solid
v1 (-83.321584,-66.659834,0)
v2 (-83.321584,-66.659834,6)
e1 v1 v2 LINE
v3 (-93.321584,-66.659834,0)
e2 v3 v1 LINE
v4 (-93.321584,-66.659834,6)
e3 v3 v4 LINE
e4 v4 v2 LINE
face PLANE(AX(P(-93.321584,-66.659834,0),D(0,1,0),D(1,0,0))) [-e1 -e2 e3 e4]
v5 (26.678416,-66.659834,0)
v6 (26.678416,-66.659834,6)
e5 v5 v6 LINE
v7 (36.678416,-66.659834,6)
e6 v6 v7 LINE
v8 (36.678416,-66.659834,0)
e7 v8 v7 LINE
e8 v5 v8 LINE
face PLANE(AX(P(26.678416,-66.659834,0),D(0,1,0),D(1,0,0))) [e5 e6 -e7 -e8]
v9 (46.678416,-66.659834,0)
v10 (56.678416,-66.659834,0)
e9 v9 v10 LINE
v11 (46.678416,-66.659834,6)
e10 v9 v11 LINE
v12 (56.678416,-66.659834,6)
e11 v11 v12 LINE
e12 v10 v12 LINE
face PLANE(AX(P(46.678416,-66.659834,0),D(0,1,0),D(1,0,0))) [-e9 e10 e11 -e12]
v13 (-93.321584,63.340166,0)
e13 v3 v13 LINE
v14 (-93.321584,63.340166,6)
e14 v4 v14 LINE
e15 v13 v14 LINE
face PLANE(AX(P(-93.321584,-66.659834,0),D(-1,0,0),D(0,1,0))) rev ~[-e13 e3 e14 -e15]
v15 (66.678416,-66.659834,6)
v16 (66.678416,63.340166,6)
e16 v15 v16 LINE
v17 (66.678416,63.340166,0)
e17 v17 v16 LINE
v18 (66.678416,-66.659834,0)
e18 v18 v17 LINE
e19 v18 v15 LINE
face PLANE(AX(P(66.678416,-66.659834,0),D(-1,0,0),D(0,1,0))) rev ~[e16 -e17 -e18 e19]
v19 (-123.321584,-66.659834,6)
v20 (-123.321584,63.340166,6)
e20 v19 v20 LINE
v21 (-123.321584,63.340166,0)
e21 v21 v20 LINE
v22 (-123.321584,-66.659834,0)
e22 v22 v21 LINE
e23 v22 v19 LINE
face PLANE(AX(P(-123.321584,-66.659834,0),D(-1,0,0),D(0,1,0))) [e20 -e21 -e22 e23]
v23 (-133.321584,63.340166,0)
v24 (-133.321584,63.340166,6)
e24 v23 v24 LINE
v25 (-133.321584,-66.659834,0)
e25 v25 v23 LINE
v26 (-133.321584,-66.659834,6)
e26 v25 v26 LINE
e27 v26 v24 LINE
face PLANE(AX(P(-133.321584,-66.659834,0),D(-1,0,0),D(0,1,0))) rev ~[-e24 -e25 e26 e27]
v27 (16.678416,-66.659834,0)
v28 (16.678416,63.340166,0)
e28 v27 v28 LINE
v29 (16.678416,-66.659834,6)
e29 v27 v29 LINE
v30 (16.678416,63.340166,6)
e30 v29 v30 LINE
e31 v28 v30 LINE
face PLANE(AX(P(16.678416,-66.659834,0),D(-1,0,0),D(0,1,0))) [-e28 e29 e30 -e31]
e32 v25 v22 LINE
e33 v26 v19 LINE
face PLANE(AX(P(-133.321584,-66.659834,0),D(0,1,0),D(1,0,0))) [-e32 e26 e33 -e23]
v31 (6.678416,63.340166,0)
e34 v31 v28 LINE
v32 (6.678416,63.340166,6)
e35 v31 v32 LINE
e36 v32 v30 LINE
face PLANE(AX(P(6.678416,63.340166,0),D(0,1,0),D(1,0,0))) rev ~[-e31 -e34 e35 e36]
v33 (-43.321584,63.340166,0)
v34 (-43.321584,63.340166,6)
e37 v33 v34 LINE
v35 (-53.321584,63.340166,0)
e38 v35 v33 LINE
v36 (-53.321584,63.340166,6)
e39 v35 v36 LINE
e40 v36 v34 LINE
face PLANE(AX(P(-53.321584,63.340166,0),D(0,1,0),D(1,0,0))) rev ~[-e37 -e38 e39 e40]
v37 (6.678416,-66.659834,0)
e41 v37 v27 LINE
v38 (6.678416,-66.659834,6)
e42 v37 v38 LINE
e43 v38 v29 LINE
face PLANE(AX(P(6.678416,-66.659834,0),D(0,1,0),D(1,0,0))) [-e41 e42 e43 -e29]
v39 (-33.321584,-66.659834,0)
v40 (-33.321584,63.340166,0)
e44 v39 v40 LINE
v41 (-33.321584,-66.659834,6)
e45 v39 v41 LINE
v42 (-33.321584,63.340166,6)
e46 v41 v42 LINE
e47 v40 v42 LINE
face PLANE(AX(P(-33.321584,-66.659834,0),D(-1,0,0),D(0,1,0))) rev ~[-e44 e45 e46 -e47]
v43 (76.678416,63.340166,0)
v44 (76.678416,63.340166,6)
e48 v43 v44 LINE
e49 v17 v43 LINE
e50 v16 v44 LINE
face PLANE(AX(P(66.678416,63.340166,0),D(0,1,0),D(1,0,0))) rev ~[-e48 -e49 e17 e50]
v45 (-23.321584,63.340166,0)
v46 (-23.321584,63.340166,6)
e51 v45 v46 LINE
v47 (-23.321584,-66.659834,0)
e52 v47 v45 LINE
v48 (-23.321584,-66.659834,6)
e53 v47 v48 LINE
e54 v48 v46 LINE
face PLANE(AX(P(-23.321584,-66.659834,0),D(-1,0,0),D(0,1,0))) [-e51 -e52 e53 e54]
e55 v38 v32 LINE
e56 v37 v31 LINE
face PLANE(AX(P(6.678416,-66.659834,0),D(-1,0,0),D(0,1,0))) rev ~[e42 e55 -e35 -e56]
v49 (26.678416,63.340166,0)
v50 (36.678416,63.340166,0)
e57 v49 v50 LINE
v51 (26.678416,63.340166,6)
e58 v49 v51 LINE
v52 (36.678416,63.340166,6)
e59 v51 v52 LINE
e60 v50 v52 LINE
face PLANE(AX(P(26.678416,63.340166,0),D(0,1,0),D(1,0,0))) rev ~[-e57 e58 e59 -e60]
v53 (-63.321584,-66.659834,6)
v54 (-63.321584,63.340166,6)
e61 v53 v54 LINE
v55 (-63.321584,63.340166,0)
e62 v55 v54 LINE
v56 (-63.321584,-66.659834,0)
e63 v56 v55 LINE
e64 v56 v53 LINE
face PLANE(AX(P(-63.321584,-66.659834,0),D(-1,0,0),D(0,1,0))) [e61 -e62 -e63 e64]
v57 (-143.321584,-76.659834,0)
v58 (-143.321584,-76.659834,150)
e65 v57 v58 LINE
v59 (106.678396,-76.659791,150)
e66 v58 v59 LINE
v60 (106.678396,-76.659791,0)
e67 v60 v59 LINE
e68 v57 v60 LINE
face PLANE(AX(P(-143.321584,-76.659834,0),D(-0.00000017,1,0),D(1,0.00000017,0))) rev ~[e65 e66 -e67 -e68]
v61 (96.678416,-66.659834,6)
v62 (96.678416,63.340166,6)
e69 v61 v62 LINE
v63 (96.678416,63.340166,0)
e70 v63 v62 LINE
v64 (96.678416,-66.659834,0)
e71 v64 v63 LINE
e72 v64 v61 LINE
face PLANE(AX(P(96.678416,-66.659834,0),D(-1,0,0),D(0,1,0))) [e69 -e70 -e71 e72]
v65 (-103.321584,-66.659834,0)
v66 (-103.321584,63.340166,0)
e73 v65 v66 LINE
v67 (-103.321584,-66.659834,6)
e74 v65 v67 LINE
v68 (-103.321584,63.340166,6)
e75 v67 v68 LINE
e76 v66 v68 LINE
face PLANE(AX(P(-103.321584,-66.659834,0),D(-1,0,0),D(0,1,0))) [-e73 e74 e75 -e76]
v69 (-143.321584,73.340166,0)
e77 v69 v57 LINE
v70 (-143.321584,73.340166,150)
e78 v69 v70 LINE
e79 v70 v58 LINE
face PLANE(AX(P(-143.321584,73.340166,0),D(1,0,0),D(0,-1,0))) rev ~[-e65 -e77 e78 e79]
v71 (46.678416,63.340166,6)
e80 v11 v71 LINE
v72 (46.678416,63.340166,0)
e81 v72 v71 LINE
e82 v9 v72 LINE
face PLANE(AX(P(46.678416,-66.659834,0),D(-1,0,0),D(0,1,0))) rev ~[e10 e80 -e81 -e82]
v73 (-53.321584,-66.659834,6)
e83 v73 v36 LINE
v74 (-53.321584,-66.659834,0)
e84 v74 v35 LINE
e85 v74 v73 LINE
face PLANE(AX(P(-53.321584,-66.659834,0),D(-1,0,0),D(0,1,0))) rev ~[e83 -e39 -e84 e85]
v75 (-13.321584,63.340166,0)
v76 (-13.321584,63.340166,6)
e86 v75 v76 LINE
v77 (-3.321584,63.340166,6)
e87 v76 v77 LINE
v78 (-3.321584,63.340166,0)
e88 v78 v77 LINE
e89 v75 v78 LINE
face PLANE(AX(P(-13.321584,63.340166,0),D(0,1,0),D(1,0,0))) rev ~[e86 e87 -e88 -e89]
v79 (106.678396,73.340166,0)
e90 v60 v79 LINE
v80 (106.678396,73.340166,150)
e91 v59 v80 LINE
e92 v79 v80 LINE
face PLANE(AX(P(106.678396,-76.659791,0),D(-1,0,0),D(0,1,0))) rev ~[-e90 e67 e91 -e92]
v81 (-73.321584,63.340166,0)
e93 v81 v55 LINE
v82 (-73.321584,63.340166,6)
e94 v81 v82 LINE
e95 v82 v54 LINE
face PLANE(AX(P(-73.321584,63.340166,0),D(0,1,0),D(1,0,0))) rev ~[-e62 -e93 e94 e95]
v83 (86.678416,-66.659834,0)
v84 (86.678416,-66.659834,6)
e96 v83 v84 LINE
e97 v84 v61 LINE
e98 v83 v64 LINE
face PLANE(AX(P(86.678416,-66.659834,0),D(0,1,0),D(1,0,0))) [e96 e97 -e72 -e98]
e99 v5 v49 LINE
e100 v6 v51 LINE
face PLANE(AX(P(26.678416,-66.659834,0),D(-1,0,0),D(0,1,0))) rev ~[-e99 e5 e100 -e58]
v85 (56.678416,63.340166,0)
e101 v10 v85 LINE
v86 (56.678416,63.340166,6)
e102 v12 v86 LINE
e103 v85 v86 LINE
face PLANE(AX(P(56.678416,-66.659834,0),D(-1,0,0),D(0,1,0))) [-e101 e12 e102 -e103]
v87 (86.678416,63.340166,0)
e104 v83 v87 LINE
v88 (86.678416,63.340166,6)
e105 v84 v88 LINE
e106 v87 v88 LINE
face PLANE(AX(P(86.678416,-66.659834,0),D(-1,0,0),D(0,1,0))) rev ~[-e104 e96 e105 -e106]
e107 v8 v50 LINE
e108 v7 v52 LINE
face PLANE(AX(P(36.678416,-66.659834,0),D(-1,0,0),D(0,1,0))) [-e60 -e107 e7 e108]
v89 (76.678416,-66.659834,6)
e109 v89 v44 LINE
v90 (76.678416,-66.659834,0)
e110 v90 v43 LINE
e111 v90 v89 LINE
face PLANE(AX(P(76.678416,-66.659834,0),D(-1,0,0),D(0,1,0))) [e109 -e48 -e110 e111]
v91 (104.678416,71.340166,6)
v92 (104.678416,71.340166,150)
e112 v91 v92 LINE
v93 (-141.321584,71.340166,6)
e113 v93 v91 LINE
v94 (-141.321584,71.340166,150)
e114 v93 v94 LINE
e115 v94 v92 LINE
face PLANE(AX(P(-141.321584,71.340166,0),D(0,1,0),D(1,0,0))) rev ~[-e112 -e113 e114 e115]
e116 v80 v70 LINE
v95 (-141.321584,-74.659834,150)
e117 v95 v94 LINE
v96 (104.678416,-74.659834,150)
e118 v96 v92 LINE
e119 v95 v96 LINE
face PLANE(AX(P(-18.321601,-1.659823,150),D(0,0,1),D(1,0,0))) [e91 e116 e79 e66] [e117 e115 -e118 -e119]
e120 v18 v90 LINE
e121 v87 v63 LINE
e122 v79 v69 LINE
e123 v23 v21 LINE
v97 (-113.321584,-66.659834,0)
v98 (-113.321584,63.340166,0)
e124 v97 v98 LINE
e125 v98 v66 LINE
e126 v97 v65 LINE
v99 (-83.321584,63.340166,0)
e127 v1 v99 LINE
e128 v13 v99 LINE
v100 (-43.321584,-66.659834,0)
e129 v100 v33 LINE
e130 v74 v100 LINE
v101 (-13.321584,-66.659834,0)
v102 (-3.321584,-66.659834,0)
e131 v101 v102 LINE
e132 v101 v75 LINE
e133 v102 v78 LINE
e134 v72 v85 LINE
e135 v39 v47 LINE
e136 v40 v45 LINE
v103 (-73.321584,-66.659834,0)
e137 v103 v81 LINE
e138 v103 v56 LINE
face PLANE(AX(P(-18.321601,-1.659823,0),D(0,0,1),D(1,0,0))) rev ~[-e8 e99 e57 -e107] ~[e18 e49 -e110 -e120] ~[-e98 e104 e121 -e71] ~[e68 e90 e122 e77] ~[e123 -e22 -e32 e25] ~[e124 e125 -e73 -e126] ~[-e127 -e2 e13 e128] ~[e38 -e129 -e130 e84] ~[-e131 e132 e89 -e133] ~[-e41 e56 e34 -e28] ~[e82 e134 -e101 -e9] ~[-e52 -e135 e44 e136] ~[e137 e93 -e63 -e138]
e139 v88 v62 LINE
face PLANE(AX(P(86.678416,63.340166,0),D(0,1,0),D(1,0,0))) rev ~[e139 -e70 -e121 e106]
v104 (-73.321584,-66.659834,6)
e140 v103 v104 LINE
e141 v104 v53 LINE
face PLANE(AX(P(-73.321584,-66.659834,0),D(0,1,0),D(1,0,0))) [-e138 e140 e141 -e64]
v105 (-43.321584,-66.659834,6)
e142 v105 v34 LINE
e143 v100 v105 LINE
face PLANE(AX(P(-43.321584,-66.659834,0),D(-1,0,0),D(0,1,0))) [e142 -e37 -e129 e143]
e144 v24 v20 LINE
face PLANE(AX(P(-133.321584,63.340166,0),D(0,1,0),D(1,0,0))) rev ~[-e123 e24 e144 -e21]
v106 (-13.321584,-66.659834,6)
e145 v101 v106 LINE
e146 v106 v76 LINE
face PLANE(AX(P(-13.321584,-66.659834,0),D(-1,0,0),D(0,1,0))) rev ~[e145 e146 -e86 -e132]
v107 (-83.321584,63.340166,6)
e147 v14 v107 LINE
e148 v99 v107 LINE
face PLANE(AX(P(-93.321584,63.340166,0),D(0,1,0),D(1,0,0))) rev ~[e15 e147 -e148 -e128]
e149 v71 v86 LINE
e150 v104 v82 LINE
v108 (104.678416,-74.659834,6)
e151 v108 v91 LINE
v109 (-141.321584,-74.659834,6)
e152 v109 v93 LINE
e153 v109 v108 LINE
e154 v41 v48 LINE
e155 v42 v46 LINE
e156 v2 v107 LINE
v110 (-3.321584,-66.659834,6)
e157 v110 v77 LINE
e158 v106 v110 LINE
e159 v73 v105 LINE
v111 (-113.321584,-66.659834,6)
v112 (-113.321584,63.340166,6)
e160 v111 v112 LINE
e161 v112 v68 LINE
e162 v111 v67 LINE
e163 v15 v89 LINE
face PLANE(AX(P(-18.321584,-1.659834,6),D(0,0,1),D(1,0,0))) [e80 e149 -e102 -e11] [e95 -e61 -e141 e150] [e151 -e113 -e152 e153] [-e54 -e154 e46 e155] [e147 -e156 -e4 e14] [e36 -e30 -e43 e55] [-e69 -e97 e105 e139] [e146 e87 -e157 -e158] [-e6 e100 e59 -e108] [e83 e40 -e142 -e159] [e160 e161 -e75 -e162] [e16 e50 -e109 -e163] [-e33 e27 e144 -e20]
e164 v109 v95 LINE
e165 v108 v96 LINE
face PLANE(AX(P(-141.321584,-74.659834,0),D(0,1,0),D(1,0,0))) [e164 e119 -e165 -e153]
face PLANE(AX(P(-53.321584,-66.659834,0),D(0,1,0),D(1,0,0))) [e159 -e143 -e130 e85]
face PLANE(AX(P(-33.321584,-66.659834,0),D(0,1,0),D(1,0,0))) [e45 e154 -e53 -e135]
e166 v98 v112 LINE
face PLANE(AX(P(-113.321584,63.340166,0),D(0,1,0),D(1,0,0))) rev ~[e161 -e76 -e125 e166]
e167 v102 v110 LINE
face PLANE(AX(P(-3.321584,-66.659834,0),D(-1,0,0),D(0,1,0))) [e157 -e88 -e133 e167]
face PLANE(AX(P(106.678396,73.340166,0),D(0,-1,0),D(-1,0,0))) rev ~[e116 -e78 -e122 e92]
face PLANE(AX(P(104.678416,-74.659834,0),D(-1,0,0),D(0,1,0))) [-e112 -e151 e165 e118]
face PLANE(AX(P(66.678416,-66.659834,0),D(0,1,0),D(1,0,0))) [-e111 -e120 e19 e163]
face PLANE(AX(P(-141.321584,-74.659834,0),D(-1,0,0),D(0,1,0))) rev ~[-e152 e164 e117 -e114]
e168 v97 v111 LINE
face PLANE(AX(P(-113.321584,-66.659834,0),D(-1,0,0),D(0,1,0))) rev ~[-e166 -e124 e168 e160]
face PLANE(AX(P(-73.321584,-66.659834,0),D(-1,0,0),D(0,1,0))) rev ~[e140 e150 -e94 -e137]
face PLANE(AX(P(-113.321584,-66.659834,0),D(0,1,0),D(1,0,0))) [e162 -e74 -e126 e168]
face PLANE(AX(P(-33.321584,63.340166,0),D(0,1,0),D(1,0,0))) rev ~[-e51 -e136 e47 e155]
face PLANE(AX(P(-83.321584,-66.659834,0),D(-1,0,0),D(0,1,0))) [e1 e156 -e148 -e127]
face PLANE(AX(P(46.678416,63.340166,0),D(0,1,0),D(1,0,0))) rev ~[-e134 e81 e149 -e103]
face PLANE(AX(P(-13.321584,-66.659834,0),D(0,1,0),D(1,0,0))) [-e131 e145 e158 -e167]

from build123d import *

# Parameters (mm, degrees)
F1_W     = 246
F1_H     = 146
F1_W_2   = 10
F1_H_2   = 130
F2_DEPTH = 6
F3_DEPTH = 150


# Not quite as in the source:
# - ends of sketch curves that miss each other by under 0.0002 mm in the source are joined


with BuildPart() as f2:
    # F1 (on face) → F2 (new body)
    with BuildSketch(Plane.XY):
        with Locations((-18.3215842792, -1.6598337144)):
            Rectangle(F1_W, F1_H)
        with Locations((-128.3215842792, -1.6598337144)):
            Rectangle(F1_W_2, F1_H_2, mode=Mode.SUBTRACT)
        with Locations((-108.3215842792, -1.6598337144)):
            Rectangle(F1_W_2, F1_H_2, mode=Mode.SUBTRACT)
        with Locations((-88.3215842792, -1.6598337144)):
            Rectangle(F1_W_2, F1_H_2, mode=Mode.SUBTRACT)
        with Locations((-68.3215842792, -1.6598337144)):
            Rectangle(F1_W_2, F1_H_2, mode=Mode.SUBTRACT)
        with Locations((-48.3215842792, -1.6598337144)):
            Rectangle(F1_W_2, F1_H_2, mode=Mode.SUBTRACT)
        with Locations((-28.3215842792, -1.6598337144)):
            Rectangle(F1_W_2, F1_H_2, mode=Mode.SUBTRACT)
        with Locations((-8.3215842792, -1.6598337144)):
            Rectangle(F1_W_2, F1_H_2, mode=Mode.SUBTRACT)
        with Locations((11.6784157208, -1.6598337144)):
            Rectangle(F1_W_2, F1_H_2, mode=Mode.SUBTRACT)
        with Locations((31.6784157208, -1.6598337144)):
            Rectangle(F1_W_2, F1_H_2, mode=Mode.SUBTRACT)
        with Locations((51.6784157208, -1.6598337144)):
            Rectangle(F1_W_2, F1_H_2, mode=Mode.SUBTRACT)
        with Locations((71.6784157208, -1.6598337144)):
            Rectangle(F1_W_2, F1_H_2, mode=Mode.SUBTRACT)
        with Locations((91.6784157208, -1.6598337144)):
            Rectangle(F1_W_2, F1_H_2, mode=Mode.SUBTRACT)
    extrude(amount=F2_DEPTH)

    # F1 (on face) → F3 (join)
    with BuildSketch(Plane.XY):
        Polygon((106.6783964634, -76.6597911716), (106.6783964634, 73.3401662856), (-143.3215842792, 73.3401662856), (-143.3215842792, -76.6598337144), align=None)
        with Locations((-18.3215842792, -1.6598337144)):
            Rectangle(F1_W, F1_H, mode=Mode.SUBTRACT)
    extrude(amount=F3_DEPTH)


solid = f2.part
